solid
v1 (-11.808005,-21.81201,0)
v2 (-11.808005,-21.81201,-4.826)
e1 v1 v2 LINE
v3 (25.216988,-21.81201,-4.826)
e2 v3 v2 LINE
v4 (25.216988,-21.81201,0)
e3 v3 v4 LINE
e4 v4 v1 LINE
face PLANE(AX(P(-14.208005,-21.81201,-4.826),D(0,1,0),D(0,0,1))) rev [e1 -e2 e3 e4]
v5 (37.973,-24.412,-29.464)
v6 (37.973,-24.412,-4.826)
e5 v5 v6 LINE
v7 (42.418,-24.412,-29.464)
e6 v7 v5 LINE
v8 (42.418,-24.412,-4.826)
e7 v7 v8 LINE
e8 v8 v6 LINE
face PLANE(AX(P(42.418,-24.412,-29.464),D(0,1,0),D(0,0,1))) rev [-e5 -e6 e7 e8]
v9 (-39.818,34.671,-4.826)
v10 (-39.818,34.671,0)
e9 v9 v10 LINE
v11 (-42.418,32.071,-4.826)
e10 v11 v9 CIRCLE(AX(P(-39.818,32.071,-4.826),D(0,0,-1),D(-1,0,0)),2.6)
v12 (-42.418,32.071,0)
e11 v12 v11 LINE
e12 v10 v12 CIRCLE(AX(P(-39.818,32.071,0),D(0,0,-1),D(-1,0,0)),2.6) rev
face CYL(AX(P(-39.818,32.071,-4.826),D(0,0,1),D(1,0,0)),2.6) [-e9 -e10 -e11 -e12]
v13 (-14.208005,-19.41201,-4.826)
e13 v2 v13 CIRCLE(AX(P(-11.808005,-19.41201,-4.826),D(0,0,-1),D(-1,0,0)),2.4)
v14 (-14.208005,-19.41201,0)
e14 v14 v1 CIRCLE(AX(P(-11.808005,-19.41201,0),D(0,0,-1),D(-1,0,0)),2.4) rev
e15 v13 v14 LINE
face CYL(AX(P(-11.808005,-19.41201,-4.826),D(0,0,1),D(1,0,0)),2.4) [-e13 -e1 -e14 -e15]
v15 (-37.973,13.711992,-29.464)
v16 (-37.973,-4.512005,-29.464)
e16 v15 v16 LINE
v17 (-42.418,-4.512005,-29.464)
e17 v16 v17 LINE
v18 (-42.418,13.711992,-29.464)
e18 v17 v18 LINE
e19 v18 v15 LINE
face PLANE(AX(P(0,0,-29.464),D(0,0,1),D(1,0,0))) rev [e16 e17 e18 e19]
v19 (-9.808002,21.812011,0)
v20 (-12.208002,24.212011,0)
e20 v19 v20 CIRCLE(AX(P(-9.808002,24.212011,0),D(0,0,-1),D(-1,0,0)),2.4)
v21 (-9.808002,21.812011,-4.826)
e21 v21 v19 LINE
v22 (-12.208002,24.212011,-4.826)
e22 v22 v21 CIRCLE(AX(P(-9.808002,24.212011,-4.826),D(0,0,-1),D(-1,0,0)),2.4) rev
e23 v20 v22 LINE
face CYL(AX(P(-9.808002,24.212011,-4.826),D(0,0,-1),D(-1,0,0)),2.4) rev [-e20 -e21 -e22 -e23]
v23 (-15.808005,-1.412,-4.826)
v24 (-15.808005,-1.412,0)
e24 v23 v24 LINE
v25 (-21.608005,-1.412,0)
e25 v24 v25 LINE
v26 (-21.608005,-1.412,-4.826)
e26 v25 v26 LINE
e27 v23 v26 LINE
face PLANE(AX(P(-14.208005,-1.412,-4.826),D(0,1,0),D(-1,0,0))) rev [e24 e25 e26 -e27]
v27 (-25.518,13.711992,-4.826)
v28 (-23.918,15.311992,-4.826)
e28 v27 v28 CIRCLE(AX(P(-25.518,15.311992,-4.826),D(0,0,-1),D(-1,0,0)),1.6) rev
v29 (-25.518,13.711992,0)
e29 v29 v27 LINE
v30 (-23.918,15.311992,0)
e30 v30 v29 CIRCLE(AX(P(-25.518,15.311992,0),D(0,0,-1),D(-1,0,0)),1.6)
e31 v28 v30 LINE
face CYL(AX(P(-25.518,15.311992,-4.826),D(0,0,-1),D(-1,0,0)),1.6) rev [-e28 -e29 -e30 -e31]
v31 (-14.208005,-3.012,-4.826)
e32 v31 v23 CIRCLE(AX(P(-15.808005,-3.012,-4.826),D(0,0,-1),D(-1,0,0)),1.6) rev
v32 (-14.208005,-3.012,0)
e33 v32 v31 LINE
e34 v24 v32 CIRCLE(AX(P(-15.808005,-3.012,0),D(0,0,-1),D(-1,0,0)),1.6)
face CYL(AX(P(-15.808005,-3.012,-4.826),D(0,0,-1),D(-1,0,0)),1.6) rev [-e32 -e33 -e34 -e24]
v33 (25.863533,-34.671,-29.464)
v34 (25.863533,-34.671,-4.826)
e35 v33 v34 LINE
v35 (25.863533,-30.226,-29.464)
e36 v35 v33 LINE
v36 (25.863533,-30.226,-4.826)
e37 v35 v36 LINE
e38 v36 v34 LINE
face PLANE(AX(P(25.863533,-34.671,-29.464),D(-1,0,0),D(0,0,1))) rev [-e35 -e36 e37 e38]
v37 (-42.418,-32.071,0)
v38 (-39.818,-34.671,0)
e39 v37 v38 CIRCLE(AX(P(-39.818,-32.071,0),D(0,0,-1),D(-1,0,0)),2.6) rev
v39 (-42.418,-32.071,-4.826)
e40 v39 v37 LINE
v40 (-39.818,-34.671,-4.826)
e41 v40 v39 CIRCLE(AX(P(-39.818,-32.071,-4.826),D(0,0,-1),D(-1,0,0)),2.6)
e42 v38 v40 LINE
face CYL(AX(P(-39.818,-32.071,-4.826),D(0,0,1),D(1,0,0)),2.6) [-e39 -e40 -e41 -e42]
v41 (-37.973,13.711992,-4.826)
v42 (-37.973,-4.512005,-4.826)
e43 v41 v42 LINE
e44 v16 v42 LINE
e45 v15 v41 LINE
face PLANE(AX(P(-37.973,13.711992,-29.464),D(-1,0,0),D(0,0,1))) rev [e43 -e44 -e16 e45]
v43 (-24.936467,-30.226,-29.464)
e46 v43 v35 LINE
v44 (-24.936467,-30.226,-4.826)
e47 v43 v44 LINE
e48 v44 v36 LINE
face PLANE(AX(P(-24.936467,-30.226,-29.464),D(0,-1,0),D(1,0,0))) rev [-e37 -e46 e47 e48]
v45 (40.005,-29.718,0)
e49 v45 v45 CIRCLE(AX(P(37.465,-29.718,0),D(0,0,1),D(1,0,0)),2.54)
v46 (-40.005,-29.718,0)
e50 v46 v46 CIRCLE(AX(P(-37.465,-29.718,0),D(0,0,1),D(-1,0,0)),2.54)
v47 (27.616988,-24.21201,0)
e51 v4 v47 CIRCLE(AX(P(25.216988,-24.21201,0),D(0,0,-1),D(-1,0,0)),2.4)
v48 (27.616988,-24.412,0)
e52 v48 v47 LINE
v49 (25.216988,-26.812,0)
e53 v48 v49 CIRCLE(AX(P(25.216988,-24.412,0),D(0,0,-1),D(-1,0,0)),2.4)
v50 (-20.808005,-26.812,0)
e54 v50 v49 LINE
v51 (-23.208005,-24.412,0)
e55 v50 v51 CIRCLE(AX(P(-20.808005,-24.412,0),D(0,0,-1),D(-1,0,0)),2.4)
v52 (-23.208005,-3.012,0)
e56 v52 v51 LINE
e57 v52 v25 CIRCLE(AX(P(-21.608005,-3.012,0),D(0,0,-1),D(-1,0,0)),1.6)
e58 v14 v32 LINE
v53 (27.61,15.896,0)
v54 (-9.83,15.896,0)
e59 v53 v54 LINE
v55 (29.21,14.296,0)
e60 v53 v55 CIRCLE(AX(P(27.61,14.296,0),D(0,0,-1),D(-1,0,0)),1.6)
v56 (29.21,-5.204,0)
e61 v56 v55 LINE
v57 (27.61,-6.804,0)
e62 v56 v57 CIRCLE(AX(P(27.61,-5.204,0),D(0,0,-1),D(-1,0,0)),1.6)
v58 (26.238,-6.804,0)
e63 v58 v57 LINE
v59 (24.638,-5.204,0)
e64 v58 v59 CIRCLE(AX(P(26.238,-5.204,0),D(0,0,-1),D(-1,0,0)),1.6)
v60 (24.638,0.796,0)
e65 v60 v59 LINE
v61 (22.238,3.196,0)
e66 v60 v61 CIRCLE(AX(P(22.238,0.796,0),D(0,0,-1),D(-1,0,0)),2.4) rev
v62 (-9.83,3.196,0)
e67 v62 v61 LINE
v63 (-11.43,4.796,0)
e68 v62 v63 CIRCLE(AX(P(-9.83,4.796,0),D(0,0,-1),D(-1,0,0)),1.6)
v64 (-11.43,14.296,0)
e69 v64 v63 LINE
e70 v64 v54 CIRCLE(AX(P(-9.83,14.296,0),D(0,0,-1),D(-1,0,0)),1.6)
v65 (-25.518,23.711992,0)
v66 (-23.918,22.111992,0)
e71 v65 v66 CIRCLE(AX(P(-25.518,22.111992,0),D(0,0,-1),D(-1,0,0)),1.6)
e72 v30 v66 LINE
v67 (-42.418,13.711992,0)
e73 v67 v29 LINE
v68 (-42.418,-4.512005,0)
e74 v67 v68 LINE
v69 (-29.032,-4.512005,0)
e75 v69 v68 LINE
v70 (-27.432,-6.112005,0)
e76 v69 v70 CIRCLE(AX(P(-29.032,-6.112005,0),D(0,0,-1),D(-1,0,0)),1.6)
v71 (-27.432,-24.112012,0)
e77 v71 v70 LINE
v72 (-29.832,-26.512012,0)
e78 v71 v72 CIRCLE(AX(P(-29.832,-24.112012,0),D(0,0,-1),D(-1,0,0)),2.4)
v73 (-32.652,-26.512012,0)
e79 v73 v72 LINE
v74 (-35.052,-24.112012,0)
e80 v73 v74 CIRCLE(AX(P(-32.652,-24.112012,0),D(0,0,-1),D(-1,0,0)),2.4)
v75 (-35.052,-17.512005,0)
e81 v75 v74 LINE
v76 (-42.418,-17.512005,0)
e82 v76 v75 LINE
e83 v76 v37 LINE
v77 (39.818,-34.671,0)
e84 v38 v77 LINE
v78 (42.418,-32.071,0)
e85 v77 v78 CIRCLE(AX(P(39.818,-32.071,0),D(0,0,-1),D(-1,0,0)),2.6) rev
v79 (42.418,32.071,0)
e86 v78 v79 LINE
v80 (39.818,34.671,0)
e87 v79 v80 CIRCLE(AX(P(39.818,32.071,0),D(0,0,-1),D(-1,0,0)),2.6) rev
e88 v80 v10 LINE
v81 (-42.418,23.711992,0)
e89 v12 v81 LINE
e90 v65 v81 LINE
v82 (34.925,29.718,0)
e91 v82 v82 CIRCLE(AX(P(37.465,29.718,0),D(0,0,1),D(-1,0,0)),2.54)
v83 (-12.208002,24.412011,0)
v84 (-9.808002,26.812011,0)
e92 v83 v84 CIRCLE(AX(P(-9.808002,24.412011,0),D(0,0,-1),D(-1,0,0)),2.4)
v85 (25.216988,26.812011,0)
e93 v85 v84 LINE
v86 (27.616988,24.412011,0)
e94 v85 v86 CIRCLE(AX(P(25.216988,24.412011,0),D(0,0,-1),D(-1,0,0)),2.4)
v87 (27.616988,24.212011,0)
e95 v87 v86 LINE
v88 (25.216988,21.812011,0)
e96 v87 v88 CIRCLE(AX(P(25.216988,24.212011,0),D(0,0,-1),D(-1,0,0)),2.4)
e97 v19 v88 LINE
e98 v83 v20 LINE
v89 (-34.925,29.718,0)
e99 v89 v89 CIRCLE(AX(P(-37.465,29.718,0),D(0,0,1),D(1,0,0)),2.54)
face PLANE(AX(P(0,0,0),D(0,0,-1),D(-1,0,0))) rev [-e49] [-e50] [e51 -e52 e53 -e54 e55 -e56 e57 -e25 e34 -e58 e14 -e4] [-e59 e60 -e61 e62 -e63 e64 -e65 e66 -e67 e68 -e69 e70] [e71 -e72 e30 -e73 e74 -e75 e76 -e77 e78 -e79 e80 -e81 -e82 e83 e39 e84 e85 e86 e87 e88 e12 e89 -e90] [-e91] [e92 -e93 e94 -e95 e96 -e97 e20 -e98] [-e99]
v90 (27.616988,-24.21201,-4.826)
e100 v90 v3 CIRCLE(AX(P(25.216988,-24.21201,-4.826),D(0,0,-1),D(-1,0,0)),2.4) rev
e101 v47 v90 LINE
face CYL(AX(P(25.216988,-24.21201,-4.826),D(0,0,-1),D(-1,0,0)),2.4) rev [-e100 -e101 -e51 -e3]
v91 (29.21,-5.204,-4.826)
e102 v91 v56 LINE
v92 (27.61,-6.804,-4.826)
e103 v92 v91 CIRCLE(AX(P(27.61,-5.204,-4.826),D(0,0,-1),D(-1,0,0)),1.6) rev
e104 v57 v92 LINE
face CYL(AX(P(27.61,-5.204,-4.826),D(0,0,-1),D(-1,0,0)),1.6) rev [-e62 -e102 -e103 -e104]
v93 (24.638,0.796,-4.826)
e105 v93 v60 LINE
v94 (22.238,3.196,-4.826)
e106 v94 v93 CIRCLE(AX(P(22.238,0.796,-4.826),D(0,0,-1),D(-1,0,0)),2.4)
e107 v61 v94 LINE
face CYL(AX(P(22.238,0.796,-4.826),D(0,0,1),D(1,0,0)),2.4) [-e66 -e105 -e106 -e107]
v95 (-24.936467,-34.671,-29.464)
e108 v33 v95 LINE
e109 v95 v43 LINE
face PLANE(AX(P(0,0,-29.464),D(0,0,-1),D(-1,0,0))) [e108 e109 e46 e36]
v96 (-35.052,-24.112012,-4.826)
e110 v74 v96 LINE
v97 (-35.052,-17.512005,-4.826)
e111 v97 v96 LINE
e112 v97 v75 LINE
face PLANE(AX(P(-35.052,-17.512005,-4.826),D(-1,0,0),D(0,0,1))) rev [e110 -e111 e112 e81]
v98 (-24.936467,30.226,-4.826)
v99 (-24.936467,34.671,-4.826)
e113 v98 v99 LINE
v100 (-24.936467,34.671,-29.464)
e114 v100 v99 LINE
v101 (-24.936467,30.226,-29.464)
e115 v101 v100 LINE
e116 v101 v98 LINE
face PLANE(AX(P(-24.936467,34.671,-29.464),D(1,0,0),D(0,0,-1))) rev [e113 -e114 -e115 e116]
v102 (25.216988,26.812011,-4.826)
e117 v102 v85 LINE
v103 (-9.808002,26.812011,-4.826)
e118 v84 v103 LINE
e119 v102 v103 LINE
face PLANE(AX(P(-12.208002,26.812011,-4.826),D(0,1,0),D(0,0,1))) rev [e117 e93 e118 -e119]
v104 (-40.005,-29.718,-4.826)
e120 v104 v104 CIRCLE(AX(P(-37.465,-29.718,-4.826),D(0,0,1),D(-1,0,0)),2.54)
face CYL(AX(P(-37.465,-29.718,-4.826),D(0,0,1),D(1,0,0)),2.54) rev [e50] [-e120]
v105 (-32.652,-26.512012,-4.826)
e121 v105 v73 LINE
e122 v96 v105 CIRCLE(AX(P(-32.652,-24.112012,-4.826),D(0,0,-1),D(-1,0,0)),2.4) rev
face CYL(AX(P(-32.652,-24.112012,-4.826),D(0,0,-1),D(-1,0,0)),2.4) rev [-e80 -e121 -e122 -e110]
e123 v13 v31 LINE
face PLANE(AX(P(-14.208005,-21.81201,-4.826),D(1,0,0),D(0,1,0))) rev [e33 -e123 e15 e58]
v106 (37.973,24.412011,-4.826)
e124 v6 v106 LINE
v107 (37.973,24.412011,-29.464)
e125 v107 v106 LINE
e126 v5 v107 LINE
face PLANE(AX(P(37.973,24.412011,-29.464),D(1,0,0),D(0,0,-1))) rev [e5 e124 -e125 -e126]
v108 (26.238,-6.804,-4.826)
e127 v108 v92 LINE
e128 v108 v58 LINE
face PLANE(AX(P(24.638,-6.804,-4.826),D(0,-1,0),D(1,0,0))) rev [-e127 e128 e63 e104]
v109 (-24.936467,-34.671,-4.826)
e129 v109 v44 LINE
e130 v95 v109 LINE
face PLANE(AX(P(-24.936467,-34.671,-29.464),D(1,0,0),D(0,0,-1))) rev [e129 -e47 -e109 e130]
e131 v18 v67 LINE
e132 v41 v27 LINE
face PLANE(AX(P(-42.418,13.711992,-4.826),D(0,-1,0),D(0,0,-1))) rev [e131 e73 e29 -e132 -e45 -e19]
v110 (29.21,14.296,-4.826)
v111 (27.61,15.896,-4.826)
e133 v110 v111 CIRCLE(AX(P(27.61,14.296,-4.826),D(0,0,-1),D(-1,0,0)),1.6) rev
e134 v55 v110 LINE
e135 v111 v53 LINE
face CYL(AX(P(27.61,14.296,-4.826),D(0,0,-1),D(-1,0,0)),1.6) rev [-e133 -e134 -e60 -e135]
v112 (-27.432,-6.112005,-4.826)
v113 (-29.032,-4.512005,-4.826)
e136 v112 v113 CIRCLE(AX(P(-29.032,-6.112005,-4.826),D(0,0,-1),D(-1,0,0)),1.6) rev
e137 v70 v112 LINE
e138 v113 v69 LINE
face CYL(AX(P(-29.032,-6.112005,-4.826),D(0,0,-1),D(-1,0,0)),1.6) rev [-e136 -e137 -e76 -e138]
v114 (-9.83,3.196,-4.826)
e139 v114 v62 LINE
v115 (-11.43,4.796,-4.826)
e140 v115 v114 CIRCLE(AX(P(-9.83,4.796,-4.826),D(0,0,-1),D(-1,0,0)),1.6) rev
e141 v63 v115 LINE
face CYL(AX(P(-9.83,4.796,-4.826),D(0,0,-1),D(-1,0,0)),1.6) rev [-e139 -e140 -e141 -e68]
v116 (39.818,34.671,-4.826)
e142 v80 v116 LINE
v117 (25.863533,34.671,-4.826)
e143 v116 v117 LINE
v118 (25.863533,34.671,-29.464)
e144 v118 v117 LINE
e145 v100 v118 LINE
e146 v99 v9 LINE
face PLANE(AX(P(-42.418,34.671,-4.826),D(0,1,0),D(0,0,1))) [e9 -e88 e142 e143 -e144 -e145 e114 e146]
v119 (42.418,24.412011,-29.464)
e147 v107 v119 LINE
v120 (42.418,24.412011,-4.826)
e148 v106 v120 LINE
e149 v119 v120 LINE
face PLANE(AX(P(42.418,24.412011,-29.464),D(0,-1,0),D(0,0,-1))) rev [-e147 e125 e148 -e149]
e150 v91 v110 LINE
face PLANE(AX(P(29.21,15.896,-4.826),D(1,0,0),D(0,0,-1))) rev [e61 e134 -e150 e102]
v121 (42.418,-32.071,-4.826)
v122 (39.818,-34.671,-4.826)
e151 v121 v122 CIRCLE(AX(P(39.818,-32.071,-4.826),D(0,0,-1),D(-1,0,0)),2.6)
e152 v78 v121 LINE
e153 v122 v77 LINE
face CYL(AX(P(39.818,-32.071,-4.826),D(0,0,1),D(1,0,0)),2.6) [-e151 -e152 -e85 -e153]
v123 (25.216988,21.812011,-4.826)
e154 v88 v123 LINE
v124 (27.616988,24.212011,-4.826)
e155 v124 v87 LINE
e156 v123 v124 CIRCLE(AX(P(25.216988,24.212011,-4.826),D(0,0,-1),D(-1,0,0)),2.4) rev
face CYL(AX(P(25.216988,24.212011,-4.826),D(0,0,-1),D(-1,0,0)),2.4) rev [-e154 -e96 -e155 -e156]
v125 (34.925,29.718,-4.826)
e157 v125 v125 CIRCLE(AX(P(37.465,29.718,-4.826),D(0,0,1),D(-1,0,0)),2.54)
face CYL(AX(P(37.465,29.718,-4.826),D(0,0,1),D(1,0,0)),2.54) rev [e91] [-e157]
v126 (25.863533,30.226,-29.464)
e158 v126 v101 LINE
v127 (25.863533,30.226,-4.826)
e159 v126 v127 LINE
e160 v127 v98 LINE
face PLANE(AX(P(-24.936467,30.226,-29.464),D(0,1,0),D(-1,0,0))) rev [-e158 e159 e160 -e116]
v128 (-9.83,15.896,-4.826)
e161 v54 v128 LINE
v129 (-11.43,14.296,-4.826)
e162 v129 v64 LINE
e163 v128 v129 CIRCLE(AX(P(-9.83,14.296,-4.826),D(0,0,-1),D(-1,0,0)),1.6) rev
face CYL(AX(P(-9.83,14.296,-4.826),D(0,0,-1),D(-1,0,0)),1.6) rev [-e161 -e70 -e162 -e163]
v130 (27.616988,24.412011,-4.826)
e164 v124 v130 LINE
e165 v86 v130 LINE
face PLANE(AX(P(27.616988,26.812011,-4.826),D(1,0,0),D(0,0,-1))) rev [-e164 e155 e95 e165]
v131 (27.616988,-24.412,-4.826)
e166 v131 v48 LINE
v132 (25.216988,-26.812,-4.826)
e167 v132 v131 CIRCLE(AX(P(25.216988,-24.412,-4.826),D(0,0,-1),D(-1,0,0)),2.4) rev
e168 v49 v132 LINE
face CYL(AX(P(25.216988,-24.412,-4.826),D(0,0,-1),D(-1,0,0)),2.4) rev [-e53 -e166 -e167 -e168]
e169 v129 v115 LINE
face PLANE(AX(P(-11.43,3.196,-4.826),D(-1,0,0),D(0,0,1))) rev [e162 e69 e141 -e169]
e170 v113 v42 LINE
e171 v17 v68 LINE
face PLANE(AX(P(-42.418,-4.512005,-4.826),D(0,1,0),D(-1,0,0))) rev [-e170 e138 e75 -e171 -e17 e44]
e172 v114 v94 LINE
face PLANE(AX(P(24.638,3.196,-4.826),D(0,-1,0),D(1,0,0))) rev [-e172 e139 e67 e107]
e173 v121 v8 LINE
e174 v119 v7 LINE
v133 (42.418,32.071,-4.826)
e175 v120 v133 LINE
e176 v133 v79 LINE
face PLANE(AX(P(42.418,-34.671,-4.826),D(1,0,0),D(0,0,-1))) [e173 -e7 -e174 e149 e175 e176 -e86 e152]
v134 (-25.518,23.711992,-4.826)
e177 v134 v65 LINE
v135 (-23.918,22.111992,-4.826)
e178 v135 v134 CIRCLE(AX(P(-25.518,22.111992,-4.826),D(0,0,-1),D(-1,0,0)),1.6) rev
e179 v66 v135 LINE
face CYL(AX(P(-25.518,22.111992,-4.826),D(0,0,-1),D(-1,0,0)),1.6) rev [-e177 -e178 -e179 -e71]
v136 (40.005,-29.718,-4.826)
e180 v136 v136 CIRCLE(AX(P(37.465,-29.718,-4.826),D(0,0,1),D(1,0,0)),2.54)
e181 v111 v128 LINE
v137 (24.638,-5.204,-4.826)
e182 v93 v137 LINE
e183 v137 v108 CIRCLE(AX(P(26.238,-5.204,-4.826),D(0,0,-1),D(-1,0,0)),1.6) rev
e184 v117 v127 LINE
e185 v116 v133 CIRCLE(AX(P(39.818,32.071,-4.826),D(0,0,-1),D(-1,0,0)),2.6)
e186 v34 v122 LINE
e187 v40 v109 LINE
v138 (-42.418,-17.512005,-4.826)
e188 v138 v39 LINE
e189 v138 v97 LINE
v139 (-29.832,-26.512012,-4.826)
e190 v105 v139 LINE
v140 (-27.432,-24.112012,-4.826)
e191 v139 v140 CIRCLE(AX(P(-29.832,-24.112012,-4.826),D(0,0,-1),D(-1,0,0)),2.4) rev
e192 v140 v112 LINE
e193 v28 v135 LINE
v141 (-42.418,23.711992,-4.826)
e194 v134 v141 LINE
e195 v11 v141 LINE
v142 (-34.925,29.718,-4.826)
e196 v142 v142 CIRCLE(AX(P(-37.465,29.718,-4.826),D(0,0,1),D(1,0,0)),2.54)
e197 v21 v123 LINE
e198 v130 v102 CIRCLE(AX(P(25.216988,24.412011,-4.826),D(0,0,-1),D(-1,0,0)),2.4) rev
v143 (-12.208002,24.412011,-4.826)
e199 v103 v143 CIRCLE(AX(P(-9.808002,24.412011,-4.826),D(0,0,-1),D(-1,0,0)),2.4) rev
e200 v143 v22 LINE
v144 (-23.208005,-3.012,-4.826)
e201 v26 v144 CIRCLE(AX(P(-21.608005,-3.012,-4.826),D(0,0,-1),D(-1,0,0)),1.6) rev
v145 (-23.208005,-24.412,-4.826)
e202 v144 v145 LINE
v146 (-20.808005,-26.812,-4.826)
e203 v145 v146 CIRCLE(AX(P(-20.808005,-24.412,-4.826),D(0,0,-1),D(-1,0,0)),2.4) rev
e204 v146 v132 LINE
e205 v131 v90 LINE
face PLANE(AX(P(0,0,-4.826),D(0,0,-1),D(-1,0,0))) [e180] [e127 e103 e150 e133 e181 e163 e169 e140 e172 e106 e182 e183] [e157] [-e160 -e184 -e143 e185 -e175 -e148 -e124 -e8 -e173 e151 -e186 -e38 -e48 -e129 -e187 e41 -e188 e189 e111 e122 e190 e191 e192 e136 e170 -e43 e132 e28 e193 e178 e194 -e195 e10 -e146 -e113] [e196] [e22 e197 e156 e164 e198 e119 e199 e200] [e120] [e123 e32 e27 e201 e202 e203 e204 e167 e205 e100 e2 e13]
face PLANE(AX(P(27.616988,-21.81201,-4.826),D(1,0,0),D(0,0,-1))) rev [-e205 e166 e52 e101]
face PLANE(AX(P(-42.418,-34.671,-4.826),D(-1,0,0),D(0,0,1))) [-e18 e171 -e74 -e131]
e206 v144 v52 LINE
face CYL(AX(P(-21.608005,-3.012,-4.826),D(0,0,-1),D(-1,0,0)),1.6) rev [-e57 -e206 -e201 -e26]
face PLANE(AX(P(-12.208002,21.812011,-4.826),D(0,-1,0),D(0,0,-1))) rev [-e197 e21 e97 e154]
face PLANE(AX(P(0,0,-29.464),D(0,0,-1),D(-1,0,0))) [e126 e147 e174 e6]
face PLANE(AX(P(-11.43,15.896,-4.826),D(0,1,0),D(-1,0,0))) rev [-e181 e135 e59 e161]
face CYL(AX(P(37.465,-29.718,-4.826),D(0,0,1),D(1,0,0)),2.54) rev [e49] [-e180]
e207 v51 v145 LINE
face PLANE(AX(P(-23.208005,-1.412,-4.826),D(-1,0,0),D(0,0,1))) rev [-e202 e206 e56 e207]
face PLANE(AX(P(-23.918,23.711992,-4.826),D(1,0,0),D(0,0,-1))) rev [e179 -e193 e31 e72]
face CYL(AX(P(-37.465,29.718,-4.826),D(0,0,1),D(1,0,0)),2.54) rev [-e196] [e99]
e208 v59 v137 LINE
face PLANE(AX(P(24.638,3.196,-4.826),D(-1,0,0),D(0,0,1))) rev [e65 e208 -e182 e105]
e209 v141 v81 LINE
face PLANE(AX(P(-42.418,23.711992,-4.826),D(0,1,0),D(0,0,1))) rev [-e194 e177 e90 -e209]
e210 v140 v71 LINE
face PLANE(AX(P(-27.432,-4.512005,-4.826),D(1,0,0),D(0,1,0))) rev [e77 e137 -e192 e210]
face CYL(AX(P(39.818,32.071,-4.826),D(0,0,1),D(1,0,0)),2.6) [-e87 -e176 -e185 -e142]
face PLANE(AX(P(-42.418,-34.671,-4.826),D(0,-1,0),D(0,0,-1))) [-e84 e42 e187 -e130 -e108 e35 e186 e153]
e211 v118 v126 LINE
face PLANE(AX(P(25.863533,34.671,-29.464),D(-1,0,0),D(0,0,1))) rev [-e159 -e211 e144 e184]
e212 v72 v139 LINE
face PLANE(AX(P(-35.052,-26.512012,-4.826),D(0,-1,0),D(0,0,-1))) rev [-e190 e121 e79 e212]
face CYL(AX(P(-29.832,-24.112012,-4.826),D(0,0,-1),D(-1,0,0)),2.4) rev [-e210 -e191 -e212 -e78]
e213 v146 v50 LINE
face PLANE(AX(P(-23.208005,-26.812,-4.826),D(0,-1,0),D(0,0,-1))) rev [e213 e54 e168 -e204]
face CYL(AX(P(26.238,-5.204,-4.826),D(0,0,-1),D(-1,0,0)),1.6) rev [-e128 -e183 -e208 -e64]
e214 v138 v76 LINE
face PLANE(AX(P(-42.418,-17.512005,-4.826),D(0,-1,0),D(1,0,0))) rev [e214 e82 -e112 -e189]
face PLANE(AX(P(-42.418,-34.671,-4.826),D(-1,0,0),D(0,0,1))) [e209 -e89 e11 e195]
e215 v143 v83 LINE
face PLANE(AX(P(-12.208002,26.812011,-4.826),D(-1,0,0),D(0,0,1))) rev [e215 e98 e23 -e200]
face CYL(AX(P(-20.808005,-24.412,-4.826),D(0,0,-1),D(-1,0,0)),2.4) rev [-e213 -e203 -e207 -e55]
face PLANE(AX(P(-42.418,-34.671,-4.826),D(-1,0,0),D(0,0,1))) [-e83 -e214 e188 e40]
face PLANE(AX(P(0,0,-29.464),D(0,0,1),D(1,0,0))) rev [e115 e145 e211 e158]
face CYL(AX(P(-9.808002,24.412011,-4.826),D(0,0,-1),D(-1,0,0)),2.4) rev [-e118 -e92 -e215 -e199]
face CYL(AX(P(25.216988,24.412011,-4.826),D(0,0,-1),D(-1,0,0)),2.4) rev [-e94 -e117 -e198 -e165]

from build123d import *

# Parameters (mm, degrees)
SKETCH1_W           = 84.836
SKETCH1_H           = 69.342
BASE_FLANGE1_DEPTH  = 4.826
SKETCH6_R           = 2.54
CUT_EXTRUDE1_DEPTH  = 10
FILLET1_R           = 2.6
SKETCH7_W           = 18.5
SKETCH7_H           = 10
SKETCH7_W_2         = 39.8249902
SKETCH7_H_2         = 5
CUT_EXTRUDE2_DEPTH  = 4.826
FILLET2_R           = 2.4
FILLET3_R           = 1.6
SKETCH11_W          = 4.445
SKETCH11_H          = 18.2239968
SKETCH11_H_2        = 48.82401137
SKETCH11_W_2        = 50.8
SKETCH11_H_3        = 4.445
BOSS_EXTRUDE1_DEPTH = 24.638


# Sheet-metal steps are written as plain solids
with BuildPart() as part:
    # Sketch1 → Base-Flange1 (new body)
    with BuildSketch(Plane.XY):
        Rectangle(SKETCH1_W, SKETCH1_H)
    extrude(amount=-BASE_FLANGE1_DEPTH)

    # Sketch6 → Cut-Extrude1 (cut)
    with BuildSketch(Plane.XY):
        with Locations((-37.465, 29.718)):
            Circle(SKETCH6_R)
        with Locations(Location((-37.465, -29.718, 0), (0, 0, 180))):
            Circle(SKETCH6_R)
        with Locations((37.465, -29.718)):
            Circle(SKETCH6_R)
        with Locations(Location((37.465, 29.718, 0), (0, 0, 180))):
            Circle(SKETCH6_R)
    extrude(amount=-CUT_EXTRUDE1_DEPTH, mode=Mode.SUBTRACT)

    # Fillet1
    fillet1_edges = [part.edges().sort_by_distance(p)[0] for p in [
        (-42.418, 34.671, -2.413),
        (42.418, 34.671, -2.413),
        (42.418, -34.671, -2.413),
        (-42.418, -34.671, -2.413),
    ]]
    fillet(fillet1_edges, radius=FILLET1_R)

    # Sketch7 → Cut-Extrude2 (cut)
    with BuildSketch(Plane.XY):
        with Locations((-33.168, 18.7119922)):
            Rectangle(SKETCH7_W, SKETCH7_H)
        Polygon((-42.418, -4.5120046), (-27.432, -4.5120046), (-27.432, -26.512012), (-35.052, -26.512012), (-35.052, -17.5120046), (-42.418, -17.5120046), align=None)
        with Locations((7.7044931, 24.3120114)):
            Rectangle(SKETCH7_W_2, SKETCH7_H_2)
        Polygon((-14.2080054, -21.81200997), (-14.2080054, -1.41199997), (-23.2080054, -1.41199997), (-23.2080054, -26.81199997), (27.6169882, -26.81199997), (27.6169882, -21.81200997), align=None)
        Polygon((24.638, 3.195999958), (-11.43, 3.195999958), (-11.43, 15.895999958), (29.21, 15.895999958), (29.21, 3.195999958), (29.21, -6.804000042), (24.638, -6.804000042), align=None)
    extrude(amount=-CUT_EXTRUDE2_DEPTH, mode=Mode.SUBTRACT)

    # Fillet2
    fillet2_edges = [part.edges().sort_by_distance(p)[0] for p in [
        (-12.208002, 21.8120114, -2.413),
        (-12.208002, 26.8120114, -2.413),
        (27.6169882, 26.8120114, -2.413),
        (27.6169882, 21.8120114, -2.413),
        (27.6169882, -21.81200997, -2.413),
        (27.6169882, -26.81199997, -2.413),
        (-23.2080054, -26.81199997, -2.413),
        (-14.2080054, -21.81200997, -2.413),
        (24.638, 3.195999958, -2.413),
        (-27.432, -26.512012, -2.413),
        (-35.052, -26.512012, -2.413),
    ]]
    fillet(fillet2_edges, radius=FILLET2_R)

    # Fillet3
    fillet3_edges = [part.edges().sort_by_distance(p)[0] for p in [
        (-23.2080054, -1.41199997, -2.413),
        (-14.2080054, -1.41199997, -2.413),
        (24.638, -6.804000042, -2.413),
        (-11.43, 3.195999958, -2.413),
        (-11.43, 15.895999958, -2.413),
        (29.21, 15.895999958, -2.413),
        (29.21, -6.804000042, -2.413),
        (-23.918, 23.7119922, -2.413),
        (-23.918, 13.7119922, -2.413),
        (-27.432, -4.5120046, -2.413),
    ]]
    fillet(fillet3_edges, radius=FILLET3_R)

    # Sketch11 → Boss-Extrude1 (add)
    with BuildSketch(Plane(origin=(0, 0, -4.826), x_dir=(-1, 0, 0), z_dir=(0, 0, -1))):
        with Locations((40.1955, 4.5999938)):
            Rectangle(SKETCH11_W, SKETCH11_H)
        with Locations((-40.1955, 5.715e-06)):
            Rectangle(SKETCH11_W, SKETCH11_H_2)
        with Locations((-0.463533105, -32.4485)):
            Rectangle(SKETCH11_W_2, SKETCH11_H_3)
        with Locations((-0.463533105, 32.4485)):
            Rectangle(SKETCH11_W_2, SKETCH11_H_3)
    extrude(amount=BOSS_EXTRUDE1_DEPTH)


solid = part.part
